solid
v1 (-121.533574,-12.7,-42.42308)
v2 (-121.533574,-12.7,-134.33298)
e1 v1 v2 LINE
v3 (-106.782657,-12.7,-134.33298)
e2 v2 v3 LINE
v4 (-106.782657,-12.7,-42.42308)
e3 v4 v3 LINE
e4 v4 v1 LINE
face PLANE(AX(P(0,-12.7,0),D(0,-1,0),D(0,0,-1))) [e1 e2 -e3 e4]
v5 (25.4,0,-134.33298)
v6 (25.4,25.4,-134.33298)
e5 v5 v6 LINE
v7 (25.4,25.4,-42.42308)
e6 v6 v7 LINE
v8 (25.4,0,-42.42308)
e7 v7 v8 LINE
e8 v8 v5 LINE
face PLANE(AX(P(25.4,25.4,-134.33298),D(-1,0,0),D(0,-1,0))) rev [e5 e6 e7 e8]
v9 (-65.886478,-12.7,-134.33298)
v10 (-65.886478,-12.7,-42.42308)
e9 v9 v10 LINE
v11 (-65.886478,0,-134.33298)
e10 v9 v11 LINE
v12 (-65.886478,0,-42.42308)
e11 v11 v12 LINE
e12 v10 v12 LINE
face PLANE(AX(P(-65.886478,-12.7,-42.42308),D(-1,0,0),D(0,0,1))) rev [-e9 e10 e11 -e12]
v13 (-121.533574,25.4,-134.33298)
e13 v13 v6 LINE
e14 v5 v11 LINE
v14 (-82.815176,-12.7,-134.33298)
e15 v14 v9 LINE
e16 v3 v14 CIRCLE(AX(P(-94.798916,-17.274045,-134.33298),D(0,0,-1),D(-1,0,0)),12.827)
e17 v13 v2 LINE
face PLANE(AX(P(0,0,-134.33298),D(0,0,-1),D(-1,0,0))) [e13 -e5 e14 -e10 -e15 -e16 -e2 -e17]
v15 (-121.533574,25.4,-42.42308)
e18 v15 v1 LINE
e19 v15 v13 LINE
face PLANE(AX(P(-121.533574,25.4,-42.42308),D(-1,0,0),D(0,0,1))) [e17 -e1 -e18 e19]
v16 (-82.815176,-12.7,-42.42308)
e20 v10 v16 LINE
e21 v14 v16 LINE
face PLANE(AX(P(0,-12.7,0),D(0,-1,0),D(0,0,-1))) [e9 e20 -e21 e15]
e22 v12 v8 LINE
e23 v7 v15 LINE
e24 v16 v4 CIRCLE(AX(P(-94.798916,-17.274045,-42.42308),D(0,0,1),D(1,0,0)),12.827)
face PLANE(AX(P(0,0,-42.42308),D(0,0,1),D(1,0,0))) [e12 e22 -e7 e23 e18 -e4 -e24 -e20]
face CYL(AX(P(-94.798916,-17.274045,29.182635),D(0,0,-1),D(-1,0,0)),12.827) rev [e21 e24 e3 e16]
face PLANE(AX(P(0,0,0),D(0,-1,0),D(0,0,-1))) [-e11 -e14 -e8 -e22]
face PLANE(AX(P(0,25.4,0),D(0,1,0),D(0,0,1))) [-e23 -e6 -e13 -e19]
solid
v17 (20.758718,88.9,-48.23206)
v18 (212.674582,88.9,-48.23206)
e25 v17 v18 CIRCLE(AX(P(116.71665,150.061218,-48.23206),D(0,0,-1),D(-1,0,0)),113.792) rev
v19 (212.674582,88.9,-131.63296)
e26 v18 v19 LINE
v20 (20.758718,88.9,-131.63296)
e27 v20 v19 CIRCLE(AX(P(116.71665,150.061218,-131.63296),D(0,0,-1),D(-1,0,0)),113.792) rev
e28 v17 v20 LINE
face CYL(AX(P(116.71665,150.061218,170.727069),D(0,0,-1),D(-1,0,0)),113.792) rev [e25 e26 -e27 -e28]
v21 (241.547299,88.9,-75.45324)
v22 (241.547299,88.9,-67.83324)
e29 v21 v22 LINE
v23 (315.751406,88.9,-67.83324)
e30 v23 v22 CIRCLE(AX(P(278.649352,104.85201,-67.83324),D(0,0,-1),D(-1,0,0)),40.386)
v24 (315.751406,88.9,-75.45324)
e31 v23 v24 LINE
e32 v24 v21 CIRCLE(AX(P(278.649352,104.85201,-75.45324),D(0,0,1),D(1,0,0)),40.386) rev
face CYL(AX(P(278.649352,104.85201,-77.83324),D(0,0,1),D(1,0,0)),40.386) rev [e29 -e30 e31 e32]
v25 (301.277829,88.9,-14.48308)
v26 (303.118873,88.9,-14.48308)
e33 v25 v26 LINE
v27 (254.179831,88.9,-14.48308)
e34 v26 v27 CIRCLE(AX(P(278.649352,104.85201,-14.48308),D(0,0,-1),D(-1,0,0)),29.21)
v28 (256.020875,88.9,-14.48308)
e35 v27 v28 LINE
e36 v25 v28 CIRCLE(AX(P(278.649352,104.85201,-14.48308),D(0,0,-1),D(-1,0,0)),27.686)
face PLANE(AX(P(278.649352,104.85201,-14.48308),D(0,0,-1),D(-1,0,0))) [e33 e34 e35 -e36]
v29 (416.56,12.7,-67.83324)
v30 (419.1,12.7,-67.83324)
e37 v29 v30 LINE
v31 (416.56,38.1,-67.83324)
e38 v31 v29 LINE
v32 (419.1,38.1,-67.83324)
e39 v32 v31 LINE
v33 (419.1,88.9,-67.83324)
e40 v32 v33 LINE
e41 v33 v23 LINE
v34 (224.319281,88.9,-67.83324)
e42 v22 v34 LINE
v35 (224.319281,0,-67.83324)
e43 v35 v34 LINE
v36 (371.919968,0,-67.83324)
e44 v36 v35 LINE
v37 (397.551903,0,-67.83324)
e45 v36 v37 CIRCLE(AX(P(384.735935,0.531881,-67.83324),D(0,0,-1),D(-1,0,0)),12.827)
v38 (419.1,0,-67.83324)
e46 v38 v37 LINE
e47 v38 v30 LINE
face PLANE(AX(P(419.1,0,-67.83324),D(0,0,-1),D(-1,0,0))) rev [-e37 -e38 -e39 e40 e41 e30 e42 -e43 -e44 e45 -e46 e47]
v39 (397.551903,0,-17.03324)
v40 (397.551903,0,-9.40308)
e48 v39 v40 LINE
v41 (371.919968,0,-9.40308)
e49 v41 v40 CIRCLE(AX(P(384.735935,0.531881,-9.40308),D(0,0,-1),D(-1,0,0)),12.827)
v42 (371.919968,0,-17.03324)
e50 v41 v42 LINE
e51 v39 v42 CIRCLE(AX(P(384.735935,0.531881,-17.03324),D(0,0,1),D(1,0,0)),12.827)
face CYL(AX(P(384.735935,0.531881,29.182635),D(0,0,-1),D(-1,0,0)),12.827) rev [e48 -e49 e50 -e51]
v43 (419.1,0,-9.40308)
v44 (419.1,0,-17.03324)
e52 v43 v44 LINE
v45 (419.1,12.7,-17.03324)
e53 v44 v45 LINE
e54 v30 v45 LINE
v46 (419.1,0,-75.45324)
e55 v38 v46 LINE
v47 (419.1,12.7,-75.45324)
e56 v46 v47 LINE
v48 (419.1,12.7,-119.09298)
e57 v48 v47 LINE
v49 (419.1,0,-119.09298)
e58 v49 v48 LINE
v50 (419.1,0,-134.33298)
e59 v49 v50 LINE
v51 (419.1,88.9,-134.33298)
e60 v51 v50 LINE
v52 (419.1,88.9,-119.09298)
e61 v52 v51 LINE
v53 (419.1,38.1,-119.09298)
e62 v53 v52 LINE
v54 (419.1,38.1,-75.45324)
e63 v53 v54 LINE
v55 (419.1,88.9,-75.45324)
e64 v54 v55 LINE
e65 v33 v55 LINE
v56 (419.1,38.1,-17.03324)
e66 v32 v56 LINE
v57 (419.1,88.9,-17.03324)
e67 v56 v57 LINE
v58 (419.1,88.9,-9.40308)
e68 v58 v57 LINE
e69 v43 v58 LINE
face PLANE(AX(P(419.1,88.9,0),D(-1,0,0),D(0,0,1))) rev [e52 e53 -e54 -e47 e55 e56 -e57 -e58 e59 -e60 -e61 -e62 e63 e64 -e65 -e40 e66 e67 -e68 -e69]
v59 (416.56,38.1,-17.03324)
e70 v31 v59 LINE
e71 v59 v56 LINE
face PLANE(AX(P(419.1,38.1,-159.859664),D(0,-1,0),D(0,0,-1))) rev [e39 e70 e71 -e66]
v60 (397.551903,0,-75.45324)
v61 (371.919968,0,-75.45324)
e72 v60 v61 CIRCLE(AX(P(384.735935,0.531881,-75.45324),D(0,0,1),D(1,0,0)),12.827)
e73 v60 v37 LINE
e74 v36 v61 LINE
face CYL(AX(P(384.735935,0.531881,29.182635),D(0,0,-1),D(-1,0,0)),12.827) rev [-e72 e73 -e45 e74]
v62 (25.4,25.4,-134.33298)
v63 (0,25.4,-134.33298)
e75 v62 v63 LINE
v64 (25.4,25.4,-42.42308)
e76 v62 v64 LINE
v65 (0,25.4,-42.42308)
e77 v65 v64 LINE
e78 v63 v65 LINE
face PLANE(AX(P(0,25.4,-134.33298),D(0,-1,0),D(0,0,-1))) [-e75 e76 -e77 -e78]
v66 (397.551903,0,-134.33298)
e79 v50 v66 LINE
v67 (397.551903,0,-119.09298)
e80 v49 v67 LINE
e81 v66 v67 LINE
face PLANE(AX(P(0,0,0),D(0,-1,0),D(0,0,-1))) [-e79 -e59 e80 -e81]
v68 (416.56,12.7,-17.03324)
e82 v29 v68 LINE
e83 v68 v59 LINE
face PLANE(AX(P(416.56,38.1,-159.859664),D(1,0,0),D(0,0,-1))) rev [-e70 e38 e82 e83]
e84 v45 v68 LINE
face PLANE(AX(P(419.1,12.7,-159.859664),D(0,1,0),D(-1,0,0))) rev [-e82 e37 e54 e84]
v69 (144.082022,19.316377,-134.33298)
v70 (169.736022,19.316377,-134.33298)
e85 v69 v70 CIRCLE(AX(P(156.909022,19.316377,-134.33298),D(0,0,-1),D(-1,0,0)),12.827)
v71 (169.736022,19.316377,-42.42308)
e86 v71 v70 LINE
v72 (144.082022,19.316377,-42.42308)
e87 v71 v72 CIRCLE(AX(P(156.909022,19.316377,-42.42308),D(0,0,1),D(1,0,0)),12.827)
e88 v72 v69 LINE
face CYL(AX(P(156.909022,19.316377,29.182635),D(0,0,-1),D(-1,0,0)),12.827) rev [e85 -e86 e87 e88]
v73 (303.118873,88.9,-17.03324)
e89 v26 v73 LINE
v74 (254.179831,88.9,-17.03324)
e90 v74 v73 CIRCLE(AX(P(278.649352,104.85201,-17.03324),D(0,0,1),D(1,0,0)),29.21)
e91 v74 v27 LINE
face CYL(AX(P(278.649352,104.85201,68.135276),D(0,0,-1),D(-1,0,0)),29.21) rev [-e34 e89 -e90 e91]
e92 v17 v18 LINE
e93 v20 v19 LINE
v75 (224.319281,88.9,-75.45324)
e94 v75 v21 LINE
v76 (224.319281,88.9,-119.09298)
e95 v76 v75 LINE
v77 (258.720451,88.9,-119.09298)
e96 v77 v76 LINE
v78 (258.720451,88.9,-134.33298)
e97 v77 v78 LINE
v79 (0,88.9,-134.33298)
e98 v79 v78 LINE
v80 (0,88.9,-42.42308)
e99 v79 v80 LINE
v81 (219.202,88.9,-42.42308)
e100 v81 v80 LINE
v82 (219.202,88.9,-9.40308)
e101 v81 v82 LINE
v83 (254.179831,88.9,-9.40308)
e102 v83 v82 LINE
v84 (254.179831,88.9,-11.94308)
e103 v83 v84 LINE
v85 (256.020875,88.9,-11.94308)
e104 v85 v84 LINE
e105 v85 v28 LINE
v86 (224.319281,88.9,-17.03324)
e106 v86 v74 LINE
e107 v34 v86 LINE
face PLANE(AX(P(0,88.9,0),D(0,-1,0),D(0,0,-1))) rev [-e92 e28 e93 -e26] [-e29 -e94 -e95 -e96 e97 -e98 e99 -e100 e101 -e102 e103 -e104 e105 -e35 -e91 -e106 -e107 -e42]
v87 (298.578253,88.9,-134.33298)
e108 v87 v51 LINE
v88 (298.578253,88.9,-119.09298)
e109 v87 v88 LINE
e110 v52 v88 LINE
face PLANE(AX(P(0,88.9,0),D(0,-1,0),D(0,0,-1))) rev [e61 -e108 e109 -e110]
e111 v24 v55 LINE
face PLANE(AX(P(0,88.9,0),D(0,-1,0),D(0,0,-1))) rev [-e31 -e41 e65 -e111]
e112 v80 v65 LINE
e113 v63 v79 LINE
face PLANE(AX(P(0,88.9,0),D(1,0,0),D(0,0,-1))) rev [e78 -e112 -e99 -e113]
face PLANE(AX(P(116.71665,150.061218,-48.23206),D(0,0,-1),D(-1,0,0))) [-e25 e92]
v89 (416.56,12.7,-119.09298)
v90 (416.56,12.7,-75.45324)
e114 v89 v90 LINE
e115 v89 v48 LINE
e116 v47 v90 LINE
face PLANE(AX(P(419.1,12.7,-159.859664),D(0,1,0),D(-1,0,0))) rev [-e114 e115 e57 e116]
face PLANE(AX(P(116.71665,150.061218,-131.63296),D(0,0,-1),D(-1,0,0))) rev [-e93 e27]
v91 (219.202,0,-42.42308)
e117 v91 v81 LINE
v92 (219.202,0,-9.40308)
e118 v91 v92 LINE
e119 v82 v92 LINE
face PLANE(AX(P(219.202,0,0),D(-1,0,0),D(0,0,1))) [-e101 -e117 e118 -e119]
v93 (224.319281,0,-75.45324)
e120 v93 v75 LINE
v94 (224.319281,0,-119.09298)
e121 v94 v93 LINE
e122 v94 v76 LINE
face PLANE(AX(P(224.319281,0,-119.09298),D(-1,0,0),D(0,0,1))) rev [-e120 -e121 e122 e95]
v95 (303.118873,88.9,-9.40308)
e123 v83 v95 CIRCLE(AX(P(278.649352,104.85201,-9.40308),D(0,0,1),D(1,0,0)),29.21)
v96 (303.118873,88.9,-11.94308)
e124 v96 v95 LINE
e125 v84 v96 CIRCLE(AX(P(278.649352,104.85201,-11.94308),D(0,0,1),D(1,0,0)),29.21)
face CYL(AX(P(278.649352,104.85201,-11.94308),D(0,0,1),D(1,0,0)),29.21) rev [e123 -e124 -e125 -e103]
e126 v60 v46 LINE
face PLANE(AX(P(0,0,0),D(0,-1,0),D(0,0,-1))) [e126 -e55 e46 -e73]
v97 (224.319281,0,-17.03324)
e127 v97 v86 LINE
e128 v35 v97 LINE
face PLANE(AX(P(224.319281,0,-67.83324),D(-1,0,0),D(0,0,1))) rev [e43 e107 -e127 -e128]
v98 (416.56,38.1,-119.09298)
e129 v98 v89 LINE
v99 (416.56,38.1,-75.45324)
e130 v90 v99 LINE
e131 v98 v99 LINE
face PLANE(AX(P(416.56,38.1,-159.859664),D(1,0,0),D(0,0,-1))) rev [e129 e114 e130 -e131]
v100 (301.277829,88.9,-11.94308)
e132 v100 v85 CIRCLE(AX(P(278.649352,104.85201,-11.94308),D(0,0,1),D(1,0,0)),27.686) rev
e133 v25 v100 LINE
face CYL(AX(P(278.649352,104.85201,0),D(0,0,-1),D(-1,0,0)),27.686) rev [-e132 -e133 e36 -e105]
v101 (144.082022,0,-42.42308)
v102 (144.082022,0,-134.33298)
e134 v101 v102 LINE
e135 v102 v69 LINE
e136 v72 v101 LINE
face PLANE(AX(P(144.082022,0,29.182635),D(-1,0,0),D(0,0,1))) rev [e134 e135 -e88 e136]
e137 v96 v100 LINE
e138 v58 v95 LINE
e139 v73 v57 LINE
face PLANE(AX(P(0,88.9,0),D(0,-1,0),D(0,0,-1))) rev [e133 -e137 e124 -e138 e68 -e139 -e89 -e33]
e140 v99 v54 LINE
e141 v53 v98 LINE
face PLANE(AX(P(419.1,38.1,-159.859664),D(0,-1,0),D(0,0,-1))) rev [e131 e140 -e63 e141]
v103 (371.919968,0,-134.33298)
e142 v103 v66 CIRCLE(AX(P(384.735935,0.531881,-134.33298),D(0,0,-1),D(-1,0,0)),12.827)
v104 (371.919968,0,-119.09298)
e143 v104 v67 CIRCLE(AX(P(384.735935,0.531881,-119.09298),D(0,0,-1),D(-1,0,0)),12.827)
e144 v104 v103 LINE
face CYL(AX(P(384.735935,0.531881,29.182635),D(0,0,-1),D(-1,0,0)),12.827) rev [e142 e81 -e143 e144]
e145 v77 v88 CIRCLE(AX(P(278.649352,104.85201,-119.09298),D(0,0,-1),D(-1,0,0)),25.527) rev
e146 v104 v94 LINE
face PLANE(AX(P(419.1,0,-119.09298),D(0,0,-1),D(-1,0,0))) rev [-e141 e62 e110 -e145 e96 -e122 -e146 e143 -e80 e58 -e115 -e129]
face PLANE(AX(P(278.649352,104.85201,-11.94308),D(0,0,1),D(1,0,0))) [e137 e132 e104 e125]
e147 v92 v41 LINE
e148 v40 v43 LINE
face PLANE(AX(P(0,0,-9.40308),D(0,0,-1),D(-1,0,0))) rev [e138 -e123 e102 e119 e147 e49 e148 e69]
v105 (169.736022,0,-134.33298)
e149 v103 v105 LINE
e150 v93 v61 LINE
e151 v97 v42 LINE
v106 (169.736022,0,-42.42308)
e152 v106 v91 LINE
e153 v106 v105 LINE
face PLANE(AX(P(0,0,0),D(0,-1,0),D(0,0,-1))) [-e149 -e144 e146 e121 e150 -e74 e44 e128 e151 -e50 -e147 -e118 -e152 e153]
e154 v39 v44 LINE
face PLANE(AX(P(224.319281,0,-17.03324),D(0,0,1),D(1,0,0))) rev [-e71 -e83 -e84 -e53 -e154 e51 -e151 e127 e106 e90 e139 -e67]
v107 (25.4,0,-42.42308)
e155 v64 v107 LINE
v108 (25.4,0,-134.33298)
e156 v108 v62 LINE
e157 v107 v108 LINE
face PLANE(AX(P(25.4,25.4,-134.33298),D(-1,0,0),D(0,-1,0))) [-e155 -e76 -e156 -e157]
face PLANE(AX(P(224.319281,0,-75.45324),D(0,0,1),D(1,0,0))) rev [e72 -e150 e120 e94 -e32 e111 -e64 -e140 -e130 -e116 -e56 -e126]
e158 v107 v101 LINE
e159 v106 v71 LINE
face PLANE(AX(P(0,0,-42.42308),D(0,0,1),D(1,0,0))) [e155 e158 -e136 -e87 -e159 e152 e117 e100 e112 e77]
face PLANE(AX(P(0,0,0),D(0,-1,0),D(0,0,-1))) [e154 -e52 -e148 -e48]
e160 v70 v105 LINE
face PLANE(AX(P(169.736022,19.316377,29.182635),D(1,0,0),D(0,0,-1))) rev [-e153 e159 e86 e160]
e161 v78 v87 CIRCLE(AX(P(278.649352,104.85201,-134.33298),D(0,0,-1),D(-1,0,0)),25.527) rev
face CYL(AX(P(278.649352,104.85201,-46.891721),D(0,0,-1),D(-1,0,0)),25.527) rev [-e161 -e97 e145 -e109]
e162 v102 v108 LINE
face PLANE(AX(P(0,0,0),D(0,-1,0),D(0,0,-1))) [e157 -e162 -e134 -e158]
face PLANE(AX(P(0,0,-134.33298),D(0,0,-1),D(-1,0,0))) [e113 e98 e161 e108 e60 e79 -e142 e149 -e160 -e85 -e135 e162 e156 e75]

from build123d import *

# Parameters (mm, degrees)
SKETCH1_W           = 419.1
SKETCH1_H           = 142.18412
BOSS_EXTRUDE1_DEPTH = 88.9
SKETCH2_R           = 119.38
CUT_EXTRUDE1_DEPTH  = 83.4009
SKETCH7_W           = 194.780719179
SKETCH7_H           = 43.63974
SKETCH7_H_2         = 50.8
CUT_EXTRUDE2_DEPTH  = 452.402640644
SKETCH4_R           = 40.386
CUT_EXTRUDE4_DEPTH  = 10
SKETCH18_R          = 25.527
CUT_EXTRUDE11_DEPTH = 23.09114
SKETCH5_R           = 27.686
CUT_EXTRUDE5_DEPTH  = 448.05209497
SKETCH8_W           = 419.1
SKETCH8_H           = 88.9
CUT_EXTRUDE6_DEPTH  = 7.85114
SKETCH9_W           = 419.1
SKETCH9_H           = 88.9
CUT_EXTRUDE7_DEPTH  = 11.94308
SKETCH10_W          = 219.202
SKETCH10_H          = 88.9
CUT_EXTRUDE8_DEPTH  = 30.48
SKETCH12_W          = 121.533574186
SKETCH12_H          = 91.9099
BOSS_EXTRUDE2_DEPTH = 25.4
SKETCH14_W          = 55.647095764
SKETCH14_H          = 91.9099
BOSS_EXTRUDE3_DEPTH = 12.7
CUT_EXTRUDE10_REACH = 447.564
SKETCH17_R          = 12.827
SKETCH20_W          = 2.54
SKETCH20_H          = 25.4
BOSS_EXTRUDE4_DEPTH = 102.05974
SPLIT2_START        = -134.33298
SPLIT2_DEPTH        = 91.9099
SPLIT2_START_2      = -48.23206
SPLIT2_2_DEPTH      = 5.80898
SPLIT2_3_DEPTH      = 2.70002
SPLIT2_4_DEPTH      = 91.9099
SPLIT2_START_3      = -121.533574186
SPLIT2_5_DEPTH      = 340.735574186
SKETCH22_W          = 199.898
SKETCH22_H          = 88.9
BOSS_EXTRUDE5_DEPTH = 2.54
SKETCH24_R          = 29.21
CUT_EXTRUDE12_DEPTH = 2.54
CUT_EXTRUDE13_START = -5.08
SKETCH24_4_R        = 29.21
CUT_EXTRUDE13_DEPTH = 2.55016
SKETCH29_R          = 12.827
CUT_EXTRUDE14_DEPTH = 446.564033133
BOSS_EXTRUDE7_DEPTH = 91.9099


# Read off the part's stored shape, not the designer's step: Split2
with BuildPart() as part:
    # Sketch1 → Boss-Extrude1 (new body)
    with BuildSketch(Plane(origin=(0, 0, 0), x_dir=(1, 0, 0), z_dir=(0, 1, 0))):
        with Locations((209.55, 71.09206)):
            Rectangle(SKETCH1_W, SKETCH1_H)
    extrude(amount=BOSS_EXTRUDE1_DEPTH)

    # Sketch2 → Cut-Extrude1 (cut)
    with BuildSketch(Plane(origin=(0, 0, -131.63296), x_dir=(-1, 0, 0), z_dir=(0, 0, -1))):
        with Locations((-116.7166499, 150.061217688)):
            Circle(SKETCH2_R)
    extrude(amount=-CUT_EXTRUDE1_DEPTH, mode=Mode.SUBTRACT)

    # Sketch7 → Cut-Extrude2 (cut, through all)
    with BuildSketch(Plane(origin=(0, 88.9, 0), x_dir=(1, 0, 0), z_dir=(0, 1, 0))):
        with Locations((321.709640411, 97.27311)):
            Rectangle(SKETCH7_W, SKETCH7_H)
        with Locations((321.709640411, 42.43324)):
            Rectangle(SKETCH7_W, SKETCH7_H_2)
    extrude(amount=-CUT_EXTRUDE2_DEPTH, mode=Mode.SUBTRACT)

    # Sketch4 → Cut-Extrude4 (cut)
    with BuildSketch(Plane(origin=(0, 0, -67.83324), x_dir=(-1, 0, 0), z_dir=(0, 0, -1))):
        with Locations((-278.649352085, 104.852009966)):
            Circle(SKETCH4_R)
    extrude(amount=CUT_EXTRUDE4_DEPTH, mode=Mode.SUBTRACT)

    # Sketch18 → Cut-Extrude11 (cut)
    with BuildSketch(Plane(origin=(0, 0, -142.18412), x_dir=(-1, 0, 0), z_dir=(0, 0, -1))):
        with Locations((-278.649352085, 104.852009966)):
            Circle(SKETCH18_R)
    extrude(amount=-CUT_EXTRUDE11_DEPTH, mode=Mode.SUBTRACT)

    # Sketch5 → Cut-Extrude5 (cut, through all)
    with BuildSketch(Plane(origin=(0, 0, -14.48308), x_dir=(-1, 0, 0), z_dir=(0, 0, -1))):
        with Locations((-278.649352085, 104.852009966)):
            Circle(SKETCH5_R)
    extrude(amount=-CUT_EXTRUDE5_DEPTH, mode=Mode.SUBTRACT)

    # Sketch8 → Cut-Extrude6 (cut)
    with BuildSketch(Plane(origin=(0, 0, -142.18412), x_dir=(-1, 0, 0), z_dir=(0, 0, -1))):
        with Locations((-209.55, 44.45)):
            Rectangle(SKETCH8_W, SKETCH8_H)
    extrude(amount=-CUT_EXTRUDE6_DEPTH, mode=Mode.SUBTRACT)

    # Sketch9 → Cut-Extrude7 (cut)
    with BuildSketch(Plane.XY):
        with Locations((209.55, 44.45)):
            Rectangle(SKETCH9_W, SKETCH9_H)
    extrude(amount=-CUT_EXTRUDE7_DEPTH, mode=Mode.SUBTRACT)

    # Sketch10 → Cut-Extrude8 (cut)
    with BuildSketch(Plane.XY.offset(-11.94308)):
        with Locations((109.601, 44.45)):
            Rectangle(SKETCH10_W, SKETCH10_H)
    extrude(amount=-CUT_EXTRUDE8_DEPTH, mode=Mode.SUBTRACT)

    # Sketch12 → Boss-Extrude2 (add)
    with BuildSketch(Plane.XZ):
        with Locations((-60.766787093, -88.37803)):
            Rectangle(SKETCH12_W, SKETCH12_H)
    extrude(amount=-BOSS_EXTRUDE2_DEPTH)

    # Sketch14 → Boss-Extrude3 (add)
    with BuildSketch(Plane.XZ):
        with Locations((-93.710026304, -88.37803)):
            Rectangle(SKETCH14_W, SKETCH14_H)
    extrude(amount=BOSS_EXTRUDE3_DEPTH)

    # Cut-Extrude10: up to this face of the body (flat: up to its plane)
    cut_extrude10_end = Plane(part.part.faces().sort_by_distance((320.017892525, 43.601141034, -11.94308))[0])
    # Sketch17 → Cut-Extrude10 (cut, up to the picked face)
    with BuildSketch(Plane(origin=(0, 0, -134.33298), x_dir=(-1, 0, 0), z_dir=(0, 0, -1)), mode=Mode.PRIVATE) as cut_extrude10_sk1:
        with Locations((-384.735935495, 0.531880938)):
            Circle(SKETCH17_R)
    cut_extrude10_tool1 = split(extrude(cut_extrude10_sk1.sketch, amount=-CUT_EXTRUDE10_REACH, mode=Mode.PRIVATE), bisect_by=cut_extrude10_end, keep=Keep.BOTH, mode=Mode.PRIVATE)
    # Sketch17 → Cut-Extrude10 (cut, up to the picked face)
    with BuildSketch(Plane(origin=(0, 0, -134.33298), x_dir=(-1, 0, 0), z_dir=(0, 0, -1)), mode=Mode.PRIVATE) as cut_extrude10_sk2:
        with Locations((94.798916194, -17.274045482)):
            Circle(SKETCH17_R)
    cut_extrude10_tool2 = split(extrude(cut_extrude10_sk2.sketch, amount=-CUT_EXTRUDE10_REACH, mode=Mode.PRIVATE), bisect_by=cut_extrude10_end, keep=Keep.BOTH, mode=Mode.PRIVATE)
    # Sketch17 → Cut-Extrude10 (cut, up to the picked face)
    with BuildSketch(Plane(origin=(0, 0, -134.33298), x_dir=(-1, 0, 0), z_dir=(0, 0, -1)), mode=Mode.PRIVATE) as cut_extrude10_sk3:
        with BuildLine():
            Line((-169.736021607, 19.31637742), (-169.736021607, 0))
            Line((-169.736021607, 0), (-144.082021607, 0))
            Line((-144.082021607, 0), (-144.082021607, 19.31637742))
            ThreePointArc((-144.082021607, 19.31637742), (-156.909021607, 32.14337742), (-169.736021607, 19.31637742))
        make_face()
    cut_extrude10_tool3 = split(extrude(cut_extrude10_sk3.sketch, amount=-CUT_EXTRUDE10_REACH, mode=Mode.PRIVATE), bisect_by=cut_extrude10_end, keep=Keep.BOTH, mode=Mode.PRIVATE)
    add(cut_extrude10_tool1.solids().sort_by(Axis((384.735935, 0.531881, -134.33298), (0, 0, 1)))[0], mode=Mode.SUBTRACT)
    add(cut_extrude10_tool2.solids().sort_by(Axis((-94.798916, -17.274045, -134.33298), (0, 0, 1)))[0], mode=Mode.SUBTRACT)
    add(cut_extrude10_tool3.solids().sort_by(Axis((156.909022, 14.834778, -134.33298), (0, 0, 1)))[0], mode=Mode.SUBTRACT)

    # Sketch20 → Boss-Extrude4 (add)
    with BuildSketch(Plane(origin=(0, 0, -17.03324), x_dir=(-1, 0, 0), z_dir=(0, 0, -1))):
        with Locations((-417.83, 25.4)):
            Rectangle(SKETCH20_W, SKETCH20_H)
    extrude(amount=BOSS_EXTRUDE4_DEPTH)

    # Split2 5 outline → Split2 5 (cut)
    with BuildSketch(Plane.YZ.offset(SPLIT2_START_3)):
        Polygon((-12.7, -42.42308), (-12.7, -134.33298), (88.9, -134.33298), (88.9, -131.63296), (88.9, -48.23206), (88.9, -42.42308), align=None)
    extrude(amount=SPLIT2_5_DEPTH, mode=Mode.SUBTRACT)

    # Sketch22 → Boss-Extrude5 (add)
    with BuildSketch(Plane.XY.offset(-11.94308)):
        with Locations((319.151, 44.45)):
            Rectangle(SKETCH22_W, SKETCH22_H)
    extrude(amount=BOSS_EXTRUDE5_DEPTH)

    # Sketch24 → Cut-Extrude12 (cut)
    with BuildSketch(Plane.XY.offset(-9.40308)):
        with Locations((278.649352085, 104.852009966)):
            Circle(SKETCH24_R)
    extrude(amount=-CUT_EXTRUDE12_DEPTH, mode=Mode.SUBTRACT)

    # Sketch24<4> → Cut-Extrude13 (cut)
    with BuildSketch(Plane.XY.offset(-9.40308).offset(CUT_EXTRUDE13_START)):
        with Locations((278.649352085, 104.852009966)):
            Circle(SKETCH24_4_R)
    extrude(amount=-CUT_EXTRUDE13_DEPTH, mode=Mode.SUBTRACT)

    # Sketch29 → Cut-Extrude14 (cut, through all)
    with BuildSketch(Plane(origin=(0, 0, -11.94308), x_dir=(-1, 0, 0), z_dir=(0, 0, -1))):
        with Locations((-384.735935495, 0.531880938)):
            Circle(SKETCH29_R)
    extrude(amount=-CUT_EXTRUDE14_DEPTH, mode=Mode.SUBTRACT)



with BuildPart() as body_2:
    # Split2 outline → Split2 (new body)
    with BuildSketch(Plane.XY.offset(SPLIT2_START)):
        with BuildLine():
            Line((219.202, 0), (219.202, 88.837550574))
            ThreePointArc((219.202, 88.837550574), (116.680284427, 30.681223227), (14.194018979, 88.9))
            Line((14.194018979, 88.9), (0, 88.9))
            Line((0, 88.9), (0, 25.4))
            Line((0, 25.4), (25.4, 25.4))
            Line((25.4, 25.4), (25.4, 0))
            Line((25.4, 0), (144.082021607, 0))
            Line((144.082021607, 0), (144.082021607, 19.31637742))
            ThreePointArc((144.082021607, 19.31637742), (156.909021607, 32.14337742), (169.736021607, 19.31637742))
            Line((169.736021607, 19.31637742), (169.736021607, 0))
            Line((169.736021607, 0), (219.202, 0))
        make_face()
    extrude(amount=SPLIT2_DEPTH)

    # Split2 2 outline → Split2 2 (add)
    with BuildSketch(Plane.XY.offset(SPLIT2_START_2)):
        with BuildLine():
            Line((219.202, 88.837550574), (219.202, 88.9))
            Line((219.202, 88.9), (14.194018979, 88.9))
            ThreePointArc((14.194018979, 88.9), (116.680284427, 30.681223227), (219.202, 88.837550574))
        make_face()
    extrude(amount=SPLIT2_2_DEPTH)

    # Split2 3 outline → Split2 3 (add)
    with BuildSketch(Plane.XY.offset(SPLIT2_START)):
        with BuildLine():
            Line((219.202, 88.837550574), (219.202, 88.9))
            Line((219.202, 88.9), (14.194018979, 88.9))
            ThreePointArc((14.194018979, 88.9), (116.680284427, 30.681223227), (219.202, 88.837550574))
        make_face()
    extrude(amount=SPLIT2_3_DEPTH)


with BuildPart() as body_3:
    # Split2 4 outline → Split2 4 (new body)
    with BuildSketch(Plane.XY.offset(SPLIT2_START)):
        with BuildLine():
            Line((25.4, 0), (25.4, 25.4))
            Line((25.4, 25.4), (-121.533574186, 25.4))
            Line((-121.533574186, 25.4), (-121.533574186, -12.7))
            Line((-121.533574186, -12.7), (-106.782656717, -12.7))
            ThreePointArc((-106.782656717, -12.7), (-94.798916194, -4.447045482), (-82.815175671, -12.7))
            Line((-82.815175671, -12.7), (-65.886478422, -12.7))
            Line((-65.886478422, -12.7), (-65.886478422, 0))
            Line((-65.886478422, 0), (25.4, 0))
        make_face()
    extrude(amount=SPLIT2_4_DEPTH)


with BuildPart() as part_1:
    add(part.part)

    add(body_2.part)  # Boss-Extrude7 merges body 2
    # Sketch30 → Boss-Extrude7 (add)
    with BuildSketch(Plane(origin=(0, 0, -134.33298), x_dir=(-1, 0, 0), z_dir=(0, 0, -1))):
        with BuildLine():
            Line((-14.194018979, 88.9), (-20.758717893, 88.9))
            ThreePointArc((-20.758717893, 88.9), (-116.7166499, 36.269217688), (-212.674581906, 88.9))
            Line((-212.674581906, 88.9), (-219.239280821, 88.9))
            ThreePointArc((-219.239280821, 88.9), (-116.7166499, 30.681217688), (-14.194018979, 88.9))
        make_face()
    extrude(amount=-BOSS_EXTRUDE7_DEPTH)


solid = Compound([body_3.part, part_1.part])
